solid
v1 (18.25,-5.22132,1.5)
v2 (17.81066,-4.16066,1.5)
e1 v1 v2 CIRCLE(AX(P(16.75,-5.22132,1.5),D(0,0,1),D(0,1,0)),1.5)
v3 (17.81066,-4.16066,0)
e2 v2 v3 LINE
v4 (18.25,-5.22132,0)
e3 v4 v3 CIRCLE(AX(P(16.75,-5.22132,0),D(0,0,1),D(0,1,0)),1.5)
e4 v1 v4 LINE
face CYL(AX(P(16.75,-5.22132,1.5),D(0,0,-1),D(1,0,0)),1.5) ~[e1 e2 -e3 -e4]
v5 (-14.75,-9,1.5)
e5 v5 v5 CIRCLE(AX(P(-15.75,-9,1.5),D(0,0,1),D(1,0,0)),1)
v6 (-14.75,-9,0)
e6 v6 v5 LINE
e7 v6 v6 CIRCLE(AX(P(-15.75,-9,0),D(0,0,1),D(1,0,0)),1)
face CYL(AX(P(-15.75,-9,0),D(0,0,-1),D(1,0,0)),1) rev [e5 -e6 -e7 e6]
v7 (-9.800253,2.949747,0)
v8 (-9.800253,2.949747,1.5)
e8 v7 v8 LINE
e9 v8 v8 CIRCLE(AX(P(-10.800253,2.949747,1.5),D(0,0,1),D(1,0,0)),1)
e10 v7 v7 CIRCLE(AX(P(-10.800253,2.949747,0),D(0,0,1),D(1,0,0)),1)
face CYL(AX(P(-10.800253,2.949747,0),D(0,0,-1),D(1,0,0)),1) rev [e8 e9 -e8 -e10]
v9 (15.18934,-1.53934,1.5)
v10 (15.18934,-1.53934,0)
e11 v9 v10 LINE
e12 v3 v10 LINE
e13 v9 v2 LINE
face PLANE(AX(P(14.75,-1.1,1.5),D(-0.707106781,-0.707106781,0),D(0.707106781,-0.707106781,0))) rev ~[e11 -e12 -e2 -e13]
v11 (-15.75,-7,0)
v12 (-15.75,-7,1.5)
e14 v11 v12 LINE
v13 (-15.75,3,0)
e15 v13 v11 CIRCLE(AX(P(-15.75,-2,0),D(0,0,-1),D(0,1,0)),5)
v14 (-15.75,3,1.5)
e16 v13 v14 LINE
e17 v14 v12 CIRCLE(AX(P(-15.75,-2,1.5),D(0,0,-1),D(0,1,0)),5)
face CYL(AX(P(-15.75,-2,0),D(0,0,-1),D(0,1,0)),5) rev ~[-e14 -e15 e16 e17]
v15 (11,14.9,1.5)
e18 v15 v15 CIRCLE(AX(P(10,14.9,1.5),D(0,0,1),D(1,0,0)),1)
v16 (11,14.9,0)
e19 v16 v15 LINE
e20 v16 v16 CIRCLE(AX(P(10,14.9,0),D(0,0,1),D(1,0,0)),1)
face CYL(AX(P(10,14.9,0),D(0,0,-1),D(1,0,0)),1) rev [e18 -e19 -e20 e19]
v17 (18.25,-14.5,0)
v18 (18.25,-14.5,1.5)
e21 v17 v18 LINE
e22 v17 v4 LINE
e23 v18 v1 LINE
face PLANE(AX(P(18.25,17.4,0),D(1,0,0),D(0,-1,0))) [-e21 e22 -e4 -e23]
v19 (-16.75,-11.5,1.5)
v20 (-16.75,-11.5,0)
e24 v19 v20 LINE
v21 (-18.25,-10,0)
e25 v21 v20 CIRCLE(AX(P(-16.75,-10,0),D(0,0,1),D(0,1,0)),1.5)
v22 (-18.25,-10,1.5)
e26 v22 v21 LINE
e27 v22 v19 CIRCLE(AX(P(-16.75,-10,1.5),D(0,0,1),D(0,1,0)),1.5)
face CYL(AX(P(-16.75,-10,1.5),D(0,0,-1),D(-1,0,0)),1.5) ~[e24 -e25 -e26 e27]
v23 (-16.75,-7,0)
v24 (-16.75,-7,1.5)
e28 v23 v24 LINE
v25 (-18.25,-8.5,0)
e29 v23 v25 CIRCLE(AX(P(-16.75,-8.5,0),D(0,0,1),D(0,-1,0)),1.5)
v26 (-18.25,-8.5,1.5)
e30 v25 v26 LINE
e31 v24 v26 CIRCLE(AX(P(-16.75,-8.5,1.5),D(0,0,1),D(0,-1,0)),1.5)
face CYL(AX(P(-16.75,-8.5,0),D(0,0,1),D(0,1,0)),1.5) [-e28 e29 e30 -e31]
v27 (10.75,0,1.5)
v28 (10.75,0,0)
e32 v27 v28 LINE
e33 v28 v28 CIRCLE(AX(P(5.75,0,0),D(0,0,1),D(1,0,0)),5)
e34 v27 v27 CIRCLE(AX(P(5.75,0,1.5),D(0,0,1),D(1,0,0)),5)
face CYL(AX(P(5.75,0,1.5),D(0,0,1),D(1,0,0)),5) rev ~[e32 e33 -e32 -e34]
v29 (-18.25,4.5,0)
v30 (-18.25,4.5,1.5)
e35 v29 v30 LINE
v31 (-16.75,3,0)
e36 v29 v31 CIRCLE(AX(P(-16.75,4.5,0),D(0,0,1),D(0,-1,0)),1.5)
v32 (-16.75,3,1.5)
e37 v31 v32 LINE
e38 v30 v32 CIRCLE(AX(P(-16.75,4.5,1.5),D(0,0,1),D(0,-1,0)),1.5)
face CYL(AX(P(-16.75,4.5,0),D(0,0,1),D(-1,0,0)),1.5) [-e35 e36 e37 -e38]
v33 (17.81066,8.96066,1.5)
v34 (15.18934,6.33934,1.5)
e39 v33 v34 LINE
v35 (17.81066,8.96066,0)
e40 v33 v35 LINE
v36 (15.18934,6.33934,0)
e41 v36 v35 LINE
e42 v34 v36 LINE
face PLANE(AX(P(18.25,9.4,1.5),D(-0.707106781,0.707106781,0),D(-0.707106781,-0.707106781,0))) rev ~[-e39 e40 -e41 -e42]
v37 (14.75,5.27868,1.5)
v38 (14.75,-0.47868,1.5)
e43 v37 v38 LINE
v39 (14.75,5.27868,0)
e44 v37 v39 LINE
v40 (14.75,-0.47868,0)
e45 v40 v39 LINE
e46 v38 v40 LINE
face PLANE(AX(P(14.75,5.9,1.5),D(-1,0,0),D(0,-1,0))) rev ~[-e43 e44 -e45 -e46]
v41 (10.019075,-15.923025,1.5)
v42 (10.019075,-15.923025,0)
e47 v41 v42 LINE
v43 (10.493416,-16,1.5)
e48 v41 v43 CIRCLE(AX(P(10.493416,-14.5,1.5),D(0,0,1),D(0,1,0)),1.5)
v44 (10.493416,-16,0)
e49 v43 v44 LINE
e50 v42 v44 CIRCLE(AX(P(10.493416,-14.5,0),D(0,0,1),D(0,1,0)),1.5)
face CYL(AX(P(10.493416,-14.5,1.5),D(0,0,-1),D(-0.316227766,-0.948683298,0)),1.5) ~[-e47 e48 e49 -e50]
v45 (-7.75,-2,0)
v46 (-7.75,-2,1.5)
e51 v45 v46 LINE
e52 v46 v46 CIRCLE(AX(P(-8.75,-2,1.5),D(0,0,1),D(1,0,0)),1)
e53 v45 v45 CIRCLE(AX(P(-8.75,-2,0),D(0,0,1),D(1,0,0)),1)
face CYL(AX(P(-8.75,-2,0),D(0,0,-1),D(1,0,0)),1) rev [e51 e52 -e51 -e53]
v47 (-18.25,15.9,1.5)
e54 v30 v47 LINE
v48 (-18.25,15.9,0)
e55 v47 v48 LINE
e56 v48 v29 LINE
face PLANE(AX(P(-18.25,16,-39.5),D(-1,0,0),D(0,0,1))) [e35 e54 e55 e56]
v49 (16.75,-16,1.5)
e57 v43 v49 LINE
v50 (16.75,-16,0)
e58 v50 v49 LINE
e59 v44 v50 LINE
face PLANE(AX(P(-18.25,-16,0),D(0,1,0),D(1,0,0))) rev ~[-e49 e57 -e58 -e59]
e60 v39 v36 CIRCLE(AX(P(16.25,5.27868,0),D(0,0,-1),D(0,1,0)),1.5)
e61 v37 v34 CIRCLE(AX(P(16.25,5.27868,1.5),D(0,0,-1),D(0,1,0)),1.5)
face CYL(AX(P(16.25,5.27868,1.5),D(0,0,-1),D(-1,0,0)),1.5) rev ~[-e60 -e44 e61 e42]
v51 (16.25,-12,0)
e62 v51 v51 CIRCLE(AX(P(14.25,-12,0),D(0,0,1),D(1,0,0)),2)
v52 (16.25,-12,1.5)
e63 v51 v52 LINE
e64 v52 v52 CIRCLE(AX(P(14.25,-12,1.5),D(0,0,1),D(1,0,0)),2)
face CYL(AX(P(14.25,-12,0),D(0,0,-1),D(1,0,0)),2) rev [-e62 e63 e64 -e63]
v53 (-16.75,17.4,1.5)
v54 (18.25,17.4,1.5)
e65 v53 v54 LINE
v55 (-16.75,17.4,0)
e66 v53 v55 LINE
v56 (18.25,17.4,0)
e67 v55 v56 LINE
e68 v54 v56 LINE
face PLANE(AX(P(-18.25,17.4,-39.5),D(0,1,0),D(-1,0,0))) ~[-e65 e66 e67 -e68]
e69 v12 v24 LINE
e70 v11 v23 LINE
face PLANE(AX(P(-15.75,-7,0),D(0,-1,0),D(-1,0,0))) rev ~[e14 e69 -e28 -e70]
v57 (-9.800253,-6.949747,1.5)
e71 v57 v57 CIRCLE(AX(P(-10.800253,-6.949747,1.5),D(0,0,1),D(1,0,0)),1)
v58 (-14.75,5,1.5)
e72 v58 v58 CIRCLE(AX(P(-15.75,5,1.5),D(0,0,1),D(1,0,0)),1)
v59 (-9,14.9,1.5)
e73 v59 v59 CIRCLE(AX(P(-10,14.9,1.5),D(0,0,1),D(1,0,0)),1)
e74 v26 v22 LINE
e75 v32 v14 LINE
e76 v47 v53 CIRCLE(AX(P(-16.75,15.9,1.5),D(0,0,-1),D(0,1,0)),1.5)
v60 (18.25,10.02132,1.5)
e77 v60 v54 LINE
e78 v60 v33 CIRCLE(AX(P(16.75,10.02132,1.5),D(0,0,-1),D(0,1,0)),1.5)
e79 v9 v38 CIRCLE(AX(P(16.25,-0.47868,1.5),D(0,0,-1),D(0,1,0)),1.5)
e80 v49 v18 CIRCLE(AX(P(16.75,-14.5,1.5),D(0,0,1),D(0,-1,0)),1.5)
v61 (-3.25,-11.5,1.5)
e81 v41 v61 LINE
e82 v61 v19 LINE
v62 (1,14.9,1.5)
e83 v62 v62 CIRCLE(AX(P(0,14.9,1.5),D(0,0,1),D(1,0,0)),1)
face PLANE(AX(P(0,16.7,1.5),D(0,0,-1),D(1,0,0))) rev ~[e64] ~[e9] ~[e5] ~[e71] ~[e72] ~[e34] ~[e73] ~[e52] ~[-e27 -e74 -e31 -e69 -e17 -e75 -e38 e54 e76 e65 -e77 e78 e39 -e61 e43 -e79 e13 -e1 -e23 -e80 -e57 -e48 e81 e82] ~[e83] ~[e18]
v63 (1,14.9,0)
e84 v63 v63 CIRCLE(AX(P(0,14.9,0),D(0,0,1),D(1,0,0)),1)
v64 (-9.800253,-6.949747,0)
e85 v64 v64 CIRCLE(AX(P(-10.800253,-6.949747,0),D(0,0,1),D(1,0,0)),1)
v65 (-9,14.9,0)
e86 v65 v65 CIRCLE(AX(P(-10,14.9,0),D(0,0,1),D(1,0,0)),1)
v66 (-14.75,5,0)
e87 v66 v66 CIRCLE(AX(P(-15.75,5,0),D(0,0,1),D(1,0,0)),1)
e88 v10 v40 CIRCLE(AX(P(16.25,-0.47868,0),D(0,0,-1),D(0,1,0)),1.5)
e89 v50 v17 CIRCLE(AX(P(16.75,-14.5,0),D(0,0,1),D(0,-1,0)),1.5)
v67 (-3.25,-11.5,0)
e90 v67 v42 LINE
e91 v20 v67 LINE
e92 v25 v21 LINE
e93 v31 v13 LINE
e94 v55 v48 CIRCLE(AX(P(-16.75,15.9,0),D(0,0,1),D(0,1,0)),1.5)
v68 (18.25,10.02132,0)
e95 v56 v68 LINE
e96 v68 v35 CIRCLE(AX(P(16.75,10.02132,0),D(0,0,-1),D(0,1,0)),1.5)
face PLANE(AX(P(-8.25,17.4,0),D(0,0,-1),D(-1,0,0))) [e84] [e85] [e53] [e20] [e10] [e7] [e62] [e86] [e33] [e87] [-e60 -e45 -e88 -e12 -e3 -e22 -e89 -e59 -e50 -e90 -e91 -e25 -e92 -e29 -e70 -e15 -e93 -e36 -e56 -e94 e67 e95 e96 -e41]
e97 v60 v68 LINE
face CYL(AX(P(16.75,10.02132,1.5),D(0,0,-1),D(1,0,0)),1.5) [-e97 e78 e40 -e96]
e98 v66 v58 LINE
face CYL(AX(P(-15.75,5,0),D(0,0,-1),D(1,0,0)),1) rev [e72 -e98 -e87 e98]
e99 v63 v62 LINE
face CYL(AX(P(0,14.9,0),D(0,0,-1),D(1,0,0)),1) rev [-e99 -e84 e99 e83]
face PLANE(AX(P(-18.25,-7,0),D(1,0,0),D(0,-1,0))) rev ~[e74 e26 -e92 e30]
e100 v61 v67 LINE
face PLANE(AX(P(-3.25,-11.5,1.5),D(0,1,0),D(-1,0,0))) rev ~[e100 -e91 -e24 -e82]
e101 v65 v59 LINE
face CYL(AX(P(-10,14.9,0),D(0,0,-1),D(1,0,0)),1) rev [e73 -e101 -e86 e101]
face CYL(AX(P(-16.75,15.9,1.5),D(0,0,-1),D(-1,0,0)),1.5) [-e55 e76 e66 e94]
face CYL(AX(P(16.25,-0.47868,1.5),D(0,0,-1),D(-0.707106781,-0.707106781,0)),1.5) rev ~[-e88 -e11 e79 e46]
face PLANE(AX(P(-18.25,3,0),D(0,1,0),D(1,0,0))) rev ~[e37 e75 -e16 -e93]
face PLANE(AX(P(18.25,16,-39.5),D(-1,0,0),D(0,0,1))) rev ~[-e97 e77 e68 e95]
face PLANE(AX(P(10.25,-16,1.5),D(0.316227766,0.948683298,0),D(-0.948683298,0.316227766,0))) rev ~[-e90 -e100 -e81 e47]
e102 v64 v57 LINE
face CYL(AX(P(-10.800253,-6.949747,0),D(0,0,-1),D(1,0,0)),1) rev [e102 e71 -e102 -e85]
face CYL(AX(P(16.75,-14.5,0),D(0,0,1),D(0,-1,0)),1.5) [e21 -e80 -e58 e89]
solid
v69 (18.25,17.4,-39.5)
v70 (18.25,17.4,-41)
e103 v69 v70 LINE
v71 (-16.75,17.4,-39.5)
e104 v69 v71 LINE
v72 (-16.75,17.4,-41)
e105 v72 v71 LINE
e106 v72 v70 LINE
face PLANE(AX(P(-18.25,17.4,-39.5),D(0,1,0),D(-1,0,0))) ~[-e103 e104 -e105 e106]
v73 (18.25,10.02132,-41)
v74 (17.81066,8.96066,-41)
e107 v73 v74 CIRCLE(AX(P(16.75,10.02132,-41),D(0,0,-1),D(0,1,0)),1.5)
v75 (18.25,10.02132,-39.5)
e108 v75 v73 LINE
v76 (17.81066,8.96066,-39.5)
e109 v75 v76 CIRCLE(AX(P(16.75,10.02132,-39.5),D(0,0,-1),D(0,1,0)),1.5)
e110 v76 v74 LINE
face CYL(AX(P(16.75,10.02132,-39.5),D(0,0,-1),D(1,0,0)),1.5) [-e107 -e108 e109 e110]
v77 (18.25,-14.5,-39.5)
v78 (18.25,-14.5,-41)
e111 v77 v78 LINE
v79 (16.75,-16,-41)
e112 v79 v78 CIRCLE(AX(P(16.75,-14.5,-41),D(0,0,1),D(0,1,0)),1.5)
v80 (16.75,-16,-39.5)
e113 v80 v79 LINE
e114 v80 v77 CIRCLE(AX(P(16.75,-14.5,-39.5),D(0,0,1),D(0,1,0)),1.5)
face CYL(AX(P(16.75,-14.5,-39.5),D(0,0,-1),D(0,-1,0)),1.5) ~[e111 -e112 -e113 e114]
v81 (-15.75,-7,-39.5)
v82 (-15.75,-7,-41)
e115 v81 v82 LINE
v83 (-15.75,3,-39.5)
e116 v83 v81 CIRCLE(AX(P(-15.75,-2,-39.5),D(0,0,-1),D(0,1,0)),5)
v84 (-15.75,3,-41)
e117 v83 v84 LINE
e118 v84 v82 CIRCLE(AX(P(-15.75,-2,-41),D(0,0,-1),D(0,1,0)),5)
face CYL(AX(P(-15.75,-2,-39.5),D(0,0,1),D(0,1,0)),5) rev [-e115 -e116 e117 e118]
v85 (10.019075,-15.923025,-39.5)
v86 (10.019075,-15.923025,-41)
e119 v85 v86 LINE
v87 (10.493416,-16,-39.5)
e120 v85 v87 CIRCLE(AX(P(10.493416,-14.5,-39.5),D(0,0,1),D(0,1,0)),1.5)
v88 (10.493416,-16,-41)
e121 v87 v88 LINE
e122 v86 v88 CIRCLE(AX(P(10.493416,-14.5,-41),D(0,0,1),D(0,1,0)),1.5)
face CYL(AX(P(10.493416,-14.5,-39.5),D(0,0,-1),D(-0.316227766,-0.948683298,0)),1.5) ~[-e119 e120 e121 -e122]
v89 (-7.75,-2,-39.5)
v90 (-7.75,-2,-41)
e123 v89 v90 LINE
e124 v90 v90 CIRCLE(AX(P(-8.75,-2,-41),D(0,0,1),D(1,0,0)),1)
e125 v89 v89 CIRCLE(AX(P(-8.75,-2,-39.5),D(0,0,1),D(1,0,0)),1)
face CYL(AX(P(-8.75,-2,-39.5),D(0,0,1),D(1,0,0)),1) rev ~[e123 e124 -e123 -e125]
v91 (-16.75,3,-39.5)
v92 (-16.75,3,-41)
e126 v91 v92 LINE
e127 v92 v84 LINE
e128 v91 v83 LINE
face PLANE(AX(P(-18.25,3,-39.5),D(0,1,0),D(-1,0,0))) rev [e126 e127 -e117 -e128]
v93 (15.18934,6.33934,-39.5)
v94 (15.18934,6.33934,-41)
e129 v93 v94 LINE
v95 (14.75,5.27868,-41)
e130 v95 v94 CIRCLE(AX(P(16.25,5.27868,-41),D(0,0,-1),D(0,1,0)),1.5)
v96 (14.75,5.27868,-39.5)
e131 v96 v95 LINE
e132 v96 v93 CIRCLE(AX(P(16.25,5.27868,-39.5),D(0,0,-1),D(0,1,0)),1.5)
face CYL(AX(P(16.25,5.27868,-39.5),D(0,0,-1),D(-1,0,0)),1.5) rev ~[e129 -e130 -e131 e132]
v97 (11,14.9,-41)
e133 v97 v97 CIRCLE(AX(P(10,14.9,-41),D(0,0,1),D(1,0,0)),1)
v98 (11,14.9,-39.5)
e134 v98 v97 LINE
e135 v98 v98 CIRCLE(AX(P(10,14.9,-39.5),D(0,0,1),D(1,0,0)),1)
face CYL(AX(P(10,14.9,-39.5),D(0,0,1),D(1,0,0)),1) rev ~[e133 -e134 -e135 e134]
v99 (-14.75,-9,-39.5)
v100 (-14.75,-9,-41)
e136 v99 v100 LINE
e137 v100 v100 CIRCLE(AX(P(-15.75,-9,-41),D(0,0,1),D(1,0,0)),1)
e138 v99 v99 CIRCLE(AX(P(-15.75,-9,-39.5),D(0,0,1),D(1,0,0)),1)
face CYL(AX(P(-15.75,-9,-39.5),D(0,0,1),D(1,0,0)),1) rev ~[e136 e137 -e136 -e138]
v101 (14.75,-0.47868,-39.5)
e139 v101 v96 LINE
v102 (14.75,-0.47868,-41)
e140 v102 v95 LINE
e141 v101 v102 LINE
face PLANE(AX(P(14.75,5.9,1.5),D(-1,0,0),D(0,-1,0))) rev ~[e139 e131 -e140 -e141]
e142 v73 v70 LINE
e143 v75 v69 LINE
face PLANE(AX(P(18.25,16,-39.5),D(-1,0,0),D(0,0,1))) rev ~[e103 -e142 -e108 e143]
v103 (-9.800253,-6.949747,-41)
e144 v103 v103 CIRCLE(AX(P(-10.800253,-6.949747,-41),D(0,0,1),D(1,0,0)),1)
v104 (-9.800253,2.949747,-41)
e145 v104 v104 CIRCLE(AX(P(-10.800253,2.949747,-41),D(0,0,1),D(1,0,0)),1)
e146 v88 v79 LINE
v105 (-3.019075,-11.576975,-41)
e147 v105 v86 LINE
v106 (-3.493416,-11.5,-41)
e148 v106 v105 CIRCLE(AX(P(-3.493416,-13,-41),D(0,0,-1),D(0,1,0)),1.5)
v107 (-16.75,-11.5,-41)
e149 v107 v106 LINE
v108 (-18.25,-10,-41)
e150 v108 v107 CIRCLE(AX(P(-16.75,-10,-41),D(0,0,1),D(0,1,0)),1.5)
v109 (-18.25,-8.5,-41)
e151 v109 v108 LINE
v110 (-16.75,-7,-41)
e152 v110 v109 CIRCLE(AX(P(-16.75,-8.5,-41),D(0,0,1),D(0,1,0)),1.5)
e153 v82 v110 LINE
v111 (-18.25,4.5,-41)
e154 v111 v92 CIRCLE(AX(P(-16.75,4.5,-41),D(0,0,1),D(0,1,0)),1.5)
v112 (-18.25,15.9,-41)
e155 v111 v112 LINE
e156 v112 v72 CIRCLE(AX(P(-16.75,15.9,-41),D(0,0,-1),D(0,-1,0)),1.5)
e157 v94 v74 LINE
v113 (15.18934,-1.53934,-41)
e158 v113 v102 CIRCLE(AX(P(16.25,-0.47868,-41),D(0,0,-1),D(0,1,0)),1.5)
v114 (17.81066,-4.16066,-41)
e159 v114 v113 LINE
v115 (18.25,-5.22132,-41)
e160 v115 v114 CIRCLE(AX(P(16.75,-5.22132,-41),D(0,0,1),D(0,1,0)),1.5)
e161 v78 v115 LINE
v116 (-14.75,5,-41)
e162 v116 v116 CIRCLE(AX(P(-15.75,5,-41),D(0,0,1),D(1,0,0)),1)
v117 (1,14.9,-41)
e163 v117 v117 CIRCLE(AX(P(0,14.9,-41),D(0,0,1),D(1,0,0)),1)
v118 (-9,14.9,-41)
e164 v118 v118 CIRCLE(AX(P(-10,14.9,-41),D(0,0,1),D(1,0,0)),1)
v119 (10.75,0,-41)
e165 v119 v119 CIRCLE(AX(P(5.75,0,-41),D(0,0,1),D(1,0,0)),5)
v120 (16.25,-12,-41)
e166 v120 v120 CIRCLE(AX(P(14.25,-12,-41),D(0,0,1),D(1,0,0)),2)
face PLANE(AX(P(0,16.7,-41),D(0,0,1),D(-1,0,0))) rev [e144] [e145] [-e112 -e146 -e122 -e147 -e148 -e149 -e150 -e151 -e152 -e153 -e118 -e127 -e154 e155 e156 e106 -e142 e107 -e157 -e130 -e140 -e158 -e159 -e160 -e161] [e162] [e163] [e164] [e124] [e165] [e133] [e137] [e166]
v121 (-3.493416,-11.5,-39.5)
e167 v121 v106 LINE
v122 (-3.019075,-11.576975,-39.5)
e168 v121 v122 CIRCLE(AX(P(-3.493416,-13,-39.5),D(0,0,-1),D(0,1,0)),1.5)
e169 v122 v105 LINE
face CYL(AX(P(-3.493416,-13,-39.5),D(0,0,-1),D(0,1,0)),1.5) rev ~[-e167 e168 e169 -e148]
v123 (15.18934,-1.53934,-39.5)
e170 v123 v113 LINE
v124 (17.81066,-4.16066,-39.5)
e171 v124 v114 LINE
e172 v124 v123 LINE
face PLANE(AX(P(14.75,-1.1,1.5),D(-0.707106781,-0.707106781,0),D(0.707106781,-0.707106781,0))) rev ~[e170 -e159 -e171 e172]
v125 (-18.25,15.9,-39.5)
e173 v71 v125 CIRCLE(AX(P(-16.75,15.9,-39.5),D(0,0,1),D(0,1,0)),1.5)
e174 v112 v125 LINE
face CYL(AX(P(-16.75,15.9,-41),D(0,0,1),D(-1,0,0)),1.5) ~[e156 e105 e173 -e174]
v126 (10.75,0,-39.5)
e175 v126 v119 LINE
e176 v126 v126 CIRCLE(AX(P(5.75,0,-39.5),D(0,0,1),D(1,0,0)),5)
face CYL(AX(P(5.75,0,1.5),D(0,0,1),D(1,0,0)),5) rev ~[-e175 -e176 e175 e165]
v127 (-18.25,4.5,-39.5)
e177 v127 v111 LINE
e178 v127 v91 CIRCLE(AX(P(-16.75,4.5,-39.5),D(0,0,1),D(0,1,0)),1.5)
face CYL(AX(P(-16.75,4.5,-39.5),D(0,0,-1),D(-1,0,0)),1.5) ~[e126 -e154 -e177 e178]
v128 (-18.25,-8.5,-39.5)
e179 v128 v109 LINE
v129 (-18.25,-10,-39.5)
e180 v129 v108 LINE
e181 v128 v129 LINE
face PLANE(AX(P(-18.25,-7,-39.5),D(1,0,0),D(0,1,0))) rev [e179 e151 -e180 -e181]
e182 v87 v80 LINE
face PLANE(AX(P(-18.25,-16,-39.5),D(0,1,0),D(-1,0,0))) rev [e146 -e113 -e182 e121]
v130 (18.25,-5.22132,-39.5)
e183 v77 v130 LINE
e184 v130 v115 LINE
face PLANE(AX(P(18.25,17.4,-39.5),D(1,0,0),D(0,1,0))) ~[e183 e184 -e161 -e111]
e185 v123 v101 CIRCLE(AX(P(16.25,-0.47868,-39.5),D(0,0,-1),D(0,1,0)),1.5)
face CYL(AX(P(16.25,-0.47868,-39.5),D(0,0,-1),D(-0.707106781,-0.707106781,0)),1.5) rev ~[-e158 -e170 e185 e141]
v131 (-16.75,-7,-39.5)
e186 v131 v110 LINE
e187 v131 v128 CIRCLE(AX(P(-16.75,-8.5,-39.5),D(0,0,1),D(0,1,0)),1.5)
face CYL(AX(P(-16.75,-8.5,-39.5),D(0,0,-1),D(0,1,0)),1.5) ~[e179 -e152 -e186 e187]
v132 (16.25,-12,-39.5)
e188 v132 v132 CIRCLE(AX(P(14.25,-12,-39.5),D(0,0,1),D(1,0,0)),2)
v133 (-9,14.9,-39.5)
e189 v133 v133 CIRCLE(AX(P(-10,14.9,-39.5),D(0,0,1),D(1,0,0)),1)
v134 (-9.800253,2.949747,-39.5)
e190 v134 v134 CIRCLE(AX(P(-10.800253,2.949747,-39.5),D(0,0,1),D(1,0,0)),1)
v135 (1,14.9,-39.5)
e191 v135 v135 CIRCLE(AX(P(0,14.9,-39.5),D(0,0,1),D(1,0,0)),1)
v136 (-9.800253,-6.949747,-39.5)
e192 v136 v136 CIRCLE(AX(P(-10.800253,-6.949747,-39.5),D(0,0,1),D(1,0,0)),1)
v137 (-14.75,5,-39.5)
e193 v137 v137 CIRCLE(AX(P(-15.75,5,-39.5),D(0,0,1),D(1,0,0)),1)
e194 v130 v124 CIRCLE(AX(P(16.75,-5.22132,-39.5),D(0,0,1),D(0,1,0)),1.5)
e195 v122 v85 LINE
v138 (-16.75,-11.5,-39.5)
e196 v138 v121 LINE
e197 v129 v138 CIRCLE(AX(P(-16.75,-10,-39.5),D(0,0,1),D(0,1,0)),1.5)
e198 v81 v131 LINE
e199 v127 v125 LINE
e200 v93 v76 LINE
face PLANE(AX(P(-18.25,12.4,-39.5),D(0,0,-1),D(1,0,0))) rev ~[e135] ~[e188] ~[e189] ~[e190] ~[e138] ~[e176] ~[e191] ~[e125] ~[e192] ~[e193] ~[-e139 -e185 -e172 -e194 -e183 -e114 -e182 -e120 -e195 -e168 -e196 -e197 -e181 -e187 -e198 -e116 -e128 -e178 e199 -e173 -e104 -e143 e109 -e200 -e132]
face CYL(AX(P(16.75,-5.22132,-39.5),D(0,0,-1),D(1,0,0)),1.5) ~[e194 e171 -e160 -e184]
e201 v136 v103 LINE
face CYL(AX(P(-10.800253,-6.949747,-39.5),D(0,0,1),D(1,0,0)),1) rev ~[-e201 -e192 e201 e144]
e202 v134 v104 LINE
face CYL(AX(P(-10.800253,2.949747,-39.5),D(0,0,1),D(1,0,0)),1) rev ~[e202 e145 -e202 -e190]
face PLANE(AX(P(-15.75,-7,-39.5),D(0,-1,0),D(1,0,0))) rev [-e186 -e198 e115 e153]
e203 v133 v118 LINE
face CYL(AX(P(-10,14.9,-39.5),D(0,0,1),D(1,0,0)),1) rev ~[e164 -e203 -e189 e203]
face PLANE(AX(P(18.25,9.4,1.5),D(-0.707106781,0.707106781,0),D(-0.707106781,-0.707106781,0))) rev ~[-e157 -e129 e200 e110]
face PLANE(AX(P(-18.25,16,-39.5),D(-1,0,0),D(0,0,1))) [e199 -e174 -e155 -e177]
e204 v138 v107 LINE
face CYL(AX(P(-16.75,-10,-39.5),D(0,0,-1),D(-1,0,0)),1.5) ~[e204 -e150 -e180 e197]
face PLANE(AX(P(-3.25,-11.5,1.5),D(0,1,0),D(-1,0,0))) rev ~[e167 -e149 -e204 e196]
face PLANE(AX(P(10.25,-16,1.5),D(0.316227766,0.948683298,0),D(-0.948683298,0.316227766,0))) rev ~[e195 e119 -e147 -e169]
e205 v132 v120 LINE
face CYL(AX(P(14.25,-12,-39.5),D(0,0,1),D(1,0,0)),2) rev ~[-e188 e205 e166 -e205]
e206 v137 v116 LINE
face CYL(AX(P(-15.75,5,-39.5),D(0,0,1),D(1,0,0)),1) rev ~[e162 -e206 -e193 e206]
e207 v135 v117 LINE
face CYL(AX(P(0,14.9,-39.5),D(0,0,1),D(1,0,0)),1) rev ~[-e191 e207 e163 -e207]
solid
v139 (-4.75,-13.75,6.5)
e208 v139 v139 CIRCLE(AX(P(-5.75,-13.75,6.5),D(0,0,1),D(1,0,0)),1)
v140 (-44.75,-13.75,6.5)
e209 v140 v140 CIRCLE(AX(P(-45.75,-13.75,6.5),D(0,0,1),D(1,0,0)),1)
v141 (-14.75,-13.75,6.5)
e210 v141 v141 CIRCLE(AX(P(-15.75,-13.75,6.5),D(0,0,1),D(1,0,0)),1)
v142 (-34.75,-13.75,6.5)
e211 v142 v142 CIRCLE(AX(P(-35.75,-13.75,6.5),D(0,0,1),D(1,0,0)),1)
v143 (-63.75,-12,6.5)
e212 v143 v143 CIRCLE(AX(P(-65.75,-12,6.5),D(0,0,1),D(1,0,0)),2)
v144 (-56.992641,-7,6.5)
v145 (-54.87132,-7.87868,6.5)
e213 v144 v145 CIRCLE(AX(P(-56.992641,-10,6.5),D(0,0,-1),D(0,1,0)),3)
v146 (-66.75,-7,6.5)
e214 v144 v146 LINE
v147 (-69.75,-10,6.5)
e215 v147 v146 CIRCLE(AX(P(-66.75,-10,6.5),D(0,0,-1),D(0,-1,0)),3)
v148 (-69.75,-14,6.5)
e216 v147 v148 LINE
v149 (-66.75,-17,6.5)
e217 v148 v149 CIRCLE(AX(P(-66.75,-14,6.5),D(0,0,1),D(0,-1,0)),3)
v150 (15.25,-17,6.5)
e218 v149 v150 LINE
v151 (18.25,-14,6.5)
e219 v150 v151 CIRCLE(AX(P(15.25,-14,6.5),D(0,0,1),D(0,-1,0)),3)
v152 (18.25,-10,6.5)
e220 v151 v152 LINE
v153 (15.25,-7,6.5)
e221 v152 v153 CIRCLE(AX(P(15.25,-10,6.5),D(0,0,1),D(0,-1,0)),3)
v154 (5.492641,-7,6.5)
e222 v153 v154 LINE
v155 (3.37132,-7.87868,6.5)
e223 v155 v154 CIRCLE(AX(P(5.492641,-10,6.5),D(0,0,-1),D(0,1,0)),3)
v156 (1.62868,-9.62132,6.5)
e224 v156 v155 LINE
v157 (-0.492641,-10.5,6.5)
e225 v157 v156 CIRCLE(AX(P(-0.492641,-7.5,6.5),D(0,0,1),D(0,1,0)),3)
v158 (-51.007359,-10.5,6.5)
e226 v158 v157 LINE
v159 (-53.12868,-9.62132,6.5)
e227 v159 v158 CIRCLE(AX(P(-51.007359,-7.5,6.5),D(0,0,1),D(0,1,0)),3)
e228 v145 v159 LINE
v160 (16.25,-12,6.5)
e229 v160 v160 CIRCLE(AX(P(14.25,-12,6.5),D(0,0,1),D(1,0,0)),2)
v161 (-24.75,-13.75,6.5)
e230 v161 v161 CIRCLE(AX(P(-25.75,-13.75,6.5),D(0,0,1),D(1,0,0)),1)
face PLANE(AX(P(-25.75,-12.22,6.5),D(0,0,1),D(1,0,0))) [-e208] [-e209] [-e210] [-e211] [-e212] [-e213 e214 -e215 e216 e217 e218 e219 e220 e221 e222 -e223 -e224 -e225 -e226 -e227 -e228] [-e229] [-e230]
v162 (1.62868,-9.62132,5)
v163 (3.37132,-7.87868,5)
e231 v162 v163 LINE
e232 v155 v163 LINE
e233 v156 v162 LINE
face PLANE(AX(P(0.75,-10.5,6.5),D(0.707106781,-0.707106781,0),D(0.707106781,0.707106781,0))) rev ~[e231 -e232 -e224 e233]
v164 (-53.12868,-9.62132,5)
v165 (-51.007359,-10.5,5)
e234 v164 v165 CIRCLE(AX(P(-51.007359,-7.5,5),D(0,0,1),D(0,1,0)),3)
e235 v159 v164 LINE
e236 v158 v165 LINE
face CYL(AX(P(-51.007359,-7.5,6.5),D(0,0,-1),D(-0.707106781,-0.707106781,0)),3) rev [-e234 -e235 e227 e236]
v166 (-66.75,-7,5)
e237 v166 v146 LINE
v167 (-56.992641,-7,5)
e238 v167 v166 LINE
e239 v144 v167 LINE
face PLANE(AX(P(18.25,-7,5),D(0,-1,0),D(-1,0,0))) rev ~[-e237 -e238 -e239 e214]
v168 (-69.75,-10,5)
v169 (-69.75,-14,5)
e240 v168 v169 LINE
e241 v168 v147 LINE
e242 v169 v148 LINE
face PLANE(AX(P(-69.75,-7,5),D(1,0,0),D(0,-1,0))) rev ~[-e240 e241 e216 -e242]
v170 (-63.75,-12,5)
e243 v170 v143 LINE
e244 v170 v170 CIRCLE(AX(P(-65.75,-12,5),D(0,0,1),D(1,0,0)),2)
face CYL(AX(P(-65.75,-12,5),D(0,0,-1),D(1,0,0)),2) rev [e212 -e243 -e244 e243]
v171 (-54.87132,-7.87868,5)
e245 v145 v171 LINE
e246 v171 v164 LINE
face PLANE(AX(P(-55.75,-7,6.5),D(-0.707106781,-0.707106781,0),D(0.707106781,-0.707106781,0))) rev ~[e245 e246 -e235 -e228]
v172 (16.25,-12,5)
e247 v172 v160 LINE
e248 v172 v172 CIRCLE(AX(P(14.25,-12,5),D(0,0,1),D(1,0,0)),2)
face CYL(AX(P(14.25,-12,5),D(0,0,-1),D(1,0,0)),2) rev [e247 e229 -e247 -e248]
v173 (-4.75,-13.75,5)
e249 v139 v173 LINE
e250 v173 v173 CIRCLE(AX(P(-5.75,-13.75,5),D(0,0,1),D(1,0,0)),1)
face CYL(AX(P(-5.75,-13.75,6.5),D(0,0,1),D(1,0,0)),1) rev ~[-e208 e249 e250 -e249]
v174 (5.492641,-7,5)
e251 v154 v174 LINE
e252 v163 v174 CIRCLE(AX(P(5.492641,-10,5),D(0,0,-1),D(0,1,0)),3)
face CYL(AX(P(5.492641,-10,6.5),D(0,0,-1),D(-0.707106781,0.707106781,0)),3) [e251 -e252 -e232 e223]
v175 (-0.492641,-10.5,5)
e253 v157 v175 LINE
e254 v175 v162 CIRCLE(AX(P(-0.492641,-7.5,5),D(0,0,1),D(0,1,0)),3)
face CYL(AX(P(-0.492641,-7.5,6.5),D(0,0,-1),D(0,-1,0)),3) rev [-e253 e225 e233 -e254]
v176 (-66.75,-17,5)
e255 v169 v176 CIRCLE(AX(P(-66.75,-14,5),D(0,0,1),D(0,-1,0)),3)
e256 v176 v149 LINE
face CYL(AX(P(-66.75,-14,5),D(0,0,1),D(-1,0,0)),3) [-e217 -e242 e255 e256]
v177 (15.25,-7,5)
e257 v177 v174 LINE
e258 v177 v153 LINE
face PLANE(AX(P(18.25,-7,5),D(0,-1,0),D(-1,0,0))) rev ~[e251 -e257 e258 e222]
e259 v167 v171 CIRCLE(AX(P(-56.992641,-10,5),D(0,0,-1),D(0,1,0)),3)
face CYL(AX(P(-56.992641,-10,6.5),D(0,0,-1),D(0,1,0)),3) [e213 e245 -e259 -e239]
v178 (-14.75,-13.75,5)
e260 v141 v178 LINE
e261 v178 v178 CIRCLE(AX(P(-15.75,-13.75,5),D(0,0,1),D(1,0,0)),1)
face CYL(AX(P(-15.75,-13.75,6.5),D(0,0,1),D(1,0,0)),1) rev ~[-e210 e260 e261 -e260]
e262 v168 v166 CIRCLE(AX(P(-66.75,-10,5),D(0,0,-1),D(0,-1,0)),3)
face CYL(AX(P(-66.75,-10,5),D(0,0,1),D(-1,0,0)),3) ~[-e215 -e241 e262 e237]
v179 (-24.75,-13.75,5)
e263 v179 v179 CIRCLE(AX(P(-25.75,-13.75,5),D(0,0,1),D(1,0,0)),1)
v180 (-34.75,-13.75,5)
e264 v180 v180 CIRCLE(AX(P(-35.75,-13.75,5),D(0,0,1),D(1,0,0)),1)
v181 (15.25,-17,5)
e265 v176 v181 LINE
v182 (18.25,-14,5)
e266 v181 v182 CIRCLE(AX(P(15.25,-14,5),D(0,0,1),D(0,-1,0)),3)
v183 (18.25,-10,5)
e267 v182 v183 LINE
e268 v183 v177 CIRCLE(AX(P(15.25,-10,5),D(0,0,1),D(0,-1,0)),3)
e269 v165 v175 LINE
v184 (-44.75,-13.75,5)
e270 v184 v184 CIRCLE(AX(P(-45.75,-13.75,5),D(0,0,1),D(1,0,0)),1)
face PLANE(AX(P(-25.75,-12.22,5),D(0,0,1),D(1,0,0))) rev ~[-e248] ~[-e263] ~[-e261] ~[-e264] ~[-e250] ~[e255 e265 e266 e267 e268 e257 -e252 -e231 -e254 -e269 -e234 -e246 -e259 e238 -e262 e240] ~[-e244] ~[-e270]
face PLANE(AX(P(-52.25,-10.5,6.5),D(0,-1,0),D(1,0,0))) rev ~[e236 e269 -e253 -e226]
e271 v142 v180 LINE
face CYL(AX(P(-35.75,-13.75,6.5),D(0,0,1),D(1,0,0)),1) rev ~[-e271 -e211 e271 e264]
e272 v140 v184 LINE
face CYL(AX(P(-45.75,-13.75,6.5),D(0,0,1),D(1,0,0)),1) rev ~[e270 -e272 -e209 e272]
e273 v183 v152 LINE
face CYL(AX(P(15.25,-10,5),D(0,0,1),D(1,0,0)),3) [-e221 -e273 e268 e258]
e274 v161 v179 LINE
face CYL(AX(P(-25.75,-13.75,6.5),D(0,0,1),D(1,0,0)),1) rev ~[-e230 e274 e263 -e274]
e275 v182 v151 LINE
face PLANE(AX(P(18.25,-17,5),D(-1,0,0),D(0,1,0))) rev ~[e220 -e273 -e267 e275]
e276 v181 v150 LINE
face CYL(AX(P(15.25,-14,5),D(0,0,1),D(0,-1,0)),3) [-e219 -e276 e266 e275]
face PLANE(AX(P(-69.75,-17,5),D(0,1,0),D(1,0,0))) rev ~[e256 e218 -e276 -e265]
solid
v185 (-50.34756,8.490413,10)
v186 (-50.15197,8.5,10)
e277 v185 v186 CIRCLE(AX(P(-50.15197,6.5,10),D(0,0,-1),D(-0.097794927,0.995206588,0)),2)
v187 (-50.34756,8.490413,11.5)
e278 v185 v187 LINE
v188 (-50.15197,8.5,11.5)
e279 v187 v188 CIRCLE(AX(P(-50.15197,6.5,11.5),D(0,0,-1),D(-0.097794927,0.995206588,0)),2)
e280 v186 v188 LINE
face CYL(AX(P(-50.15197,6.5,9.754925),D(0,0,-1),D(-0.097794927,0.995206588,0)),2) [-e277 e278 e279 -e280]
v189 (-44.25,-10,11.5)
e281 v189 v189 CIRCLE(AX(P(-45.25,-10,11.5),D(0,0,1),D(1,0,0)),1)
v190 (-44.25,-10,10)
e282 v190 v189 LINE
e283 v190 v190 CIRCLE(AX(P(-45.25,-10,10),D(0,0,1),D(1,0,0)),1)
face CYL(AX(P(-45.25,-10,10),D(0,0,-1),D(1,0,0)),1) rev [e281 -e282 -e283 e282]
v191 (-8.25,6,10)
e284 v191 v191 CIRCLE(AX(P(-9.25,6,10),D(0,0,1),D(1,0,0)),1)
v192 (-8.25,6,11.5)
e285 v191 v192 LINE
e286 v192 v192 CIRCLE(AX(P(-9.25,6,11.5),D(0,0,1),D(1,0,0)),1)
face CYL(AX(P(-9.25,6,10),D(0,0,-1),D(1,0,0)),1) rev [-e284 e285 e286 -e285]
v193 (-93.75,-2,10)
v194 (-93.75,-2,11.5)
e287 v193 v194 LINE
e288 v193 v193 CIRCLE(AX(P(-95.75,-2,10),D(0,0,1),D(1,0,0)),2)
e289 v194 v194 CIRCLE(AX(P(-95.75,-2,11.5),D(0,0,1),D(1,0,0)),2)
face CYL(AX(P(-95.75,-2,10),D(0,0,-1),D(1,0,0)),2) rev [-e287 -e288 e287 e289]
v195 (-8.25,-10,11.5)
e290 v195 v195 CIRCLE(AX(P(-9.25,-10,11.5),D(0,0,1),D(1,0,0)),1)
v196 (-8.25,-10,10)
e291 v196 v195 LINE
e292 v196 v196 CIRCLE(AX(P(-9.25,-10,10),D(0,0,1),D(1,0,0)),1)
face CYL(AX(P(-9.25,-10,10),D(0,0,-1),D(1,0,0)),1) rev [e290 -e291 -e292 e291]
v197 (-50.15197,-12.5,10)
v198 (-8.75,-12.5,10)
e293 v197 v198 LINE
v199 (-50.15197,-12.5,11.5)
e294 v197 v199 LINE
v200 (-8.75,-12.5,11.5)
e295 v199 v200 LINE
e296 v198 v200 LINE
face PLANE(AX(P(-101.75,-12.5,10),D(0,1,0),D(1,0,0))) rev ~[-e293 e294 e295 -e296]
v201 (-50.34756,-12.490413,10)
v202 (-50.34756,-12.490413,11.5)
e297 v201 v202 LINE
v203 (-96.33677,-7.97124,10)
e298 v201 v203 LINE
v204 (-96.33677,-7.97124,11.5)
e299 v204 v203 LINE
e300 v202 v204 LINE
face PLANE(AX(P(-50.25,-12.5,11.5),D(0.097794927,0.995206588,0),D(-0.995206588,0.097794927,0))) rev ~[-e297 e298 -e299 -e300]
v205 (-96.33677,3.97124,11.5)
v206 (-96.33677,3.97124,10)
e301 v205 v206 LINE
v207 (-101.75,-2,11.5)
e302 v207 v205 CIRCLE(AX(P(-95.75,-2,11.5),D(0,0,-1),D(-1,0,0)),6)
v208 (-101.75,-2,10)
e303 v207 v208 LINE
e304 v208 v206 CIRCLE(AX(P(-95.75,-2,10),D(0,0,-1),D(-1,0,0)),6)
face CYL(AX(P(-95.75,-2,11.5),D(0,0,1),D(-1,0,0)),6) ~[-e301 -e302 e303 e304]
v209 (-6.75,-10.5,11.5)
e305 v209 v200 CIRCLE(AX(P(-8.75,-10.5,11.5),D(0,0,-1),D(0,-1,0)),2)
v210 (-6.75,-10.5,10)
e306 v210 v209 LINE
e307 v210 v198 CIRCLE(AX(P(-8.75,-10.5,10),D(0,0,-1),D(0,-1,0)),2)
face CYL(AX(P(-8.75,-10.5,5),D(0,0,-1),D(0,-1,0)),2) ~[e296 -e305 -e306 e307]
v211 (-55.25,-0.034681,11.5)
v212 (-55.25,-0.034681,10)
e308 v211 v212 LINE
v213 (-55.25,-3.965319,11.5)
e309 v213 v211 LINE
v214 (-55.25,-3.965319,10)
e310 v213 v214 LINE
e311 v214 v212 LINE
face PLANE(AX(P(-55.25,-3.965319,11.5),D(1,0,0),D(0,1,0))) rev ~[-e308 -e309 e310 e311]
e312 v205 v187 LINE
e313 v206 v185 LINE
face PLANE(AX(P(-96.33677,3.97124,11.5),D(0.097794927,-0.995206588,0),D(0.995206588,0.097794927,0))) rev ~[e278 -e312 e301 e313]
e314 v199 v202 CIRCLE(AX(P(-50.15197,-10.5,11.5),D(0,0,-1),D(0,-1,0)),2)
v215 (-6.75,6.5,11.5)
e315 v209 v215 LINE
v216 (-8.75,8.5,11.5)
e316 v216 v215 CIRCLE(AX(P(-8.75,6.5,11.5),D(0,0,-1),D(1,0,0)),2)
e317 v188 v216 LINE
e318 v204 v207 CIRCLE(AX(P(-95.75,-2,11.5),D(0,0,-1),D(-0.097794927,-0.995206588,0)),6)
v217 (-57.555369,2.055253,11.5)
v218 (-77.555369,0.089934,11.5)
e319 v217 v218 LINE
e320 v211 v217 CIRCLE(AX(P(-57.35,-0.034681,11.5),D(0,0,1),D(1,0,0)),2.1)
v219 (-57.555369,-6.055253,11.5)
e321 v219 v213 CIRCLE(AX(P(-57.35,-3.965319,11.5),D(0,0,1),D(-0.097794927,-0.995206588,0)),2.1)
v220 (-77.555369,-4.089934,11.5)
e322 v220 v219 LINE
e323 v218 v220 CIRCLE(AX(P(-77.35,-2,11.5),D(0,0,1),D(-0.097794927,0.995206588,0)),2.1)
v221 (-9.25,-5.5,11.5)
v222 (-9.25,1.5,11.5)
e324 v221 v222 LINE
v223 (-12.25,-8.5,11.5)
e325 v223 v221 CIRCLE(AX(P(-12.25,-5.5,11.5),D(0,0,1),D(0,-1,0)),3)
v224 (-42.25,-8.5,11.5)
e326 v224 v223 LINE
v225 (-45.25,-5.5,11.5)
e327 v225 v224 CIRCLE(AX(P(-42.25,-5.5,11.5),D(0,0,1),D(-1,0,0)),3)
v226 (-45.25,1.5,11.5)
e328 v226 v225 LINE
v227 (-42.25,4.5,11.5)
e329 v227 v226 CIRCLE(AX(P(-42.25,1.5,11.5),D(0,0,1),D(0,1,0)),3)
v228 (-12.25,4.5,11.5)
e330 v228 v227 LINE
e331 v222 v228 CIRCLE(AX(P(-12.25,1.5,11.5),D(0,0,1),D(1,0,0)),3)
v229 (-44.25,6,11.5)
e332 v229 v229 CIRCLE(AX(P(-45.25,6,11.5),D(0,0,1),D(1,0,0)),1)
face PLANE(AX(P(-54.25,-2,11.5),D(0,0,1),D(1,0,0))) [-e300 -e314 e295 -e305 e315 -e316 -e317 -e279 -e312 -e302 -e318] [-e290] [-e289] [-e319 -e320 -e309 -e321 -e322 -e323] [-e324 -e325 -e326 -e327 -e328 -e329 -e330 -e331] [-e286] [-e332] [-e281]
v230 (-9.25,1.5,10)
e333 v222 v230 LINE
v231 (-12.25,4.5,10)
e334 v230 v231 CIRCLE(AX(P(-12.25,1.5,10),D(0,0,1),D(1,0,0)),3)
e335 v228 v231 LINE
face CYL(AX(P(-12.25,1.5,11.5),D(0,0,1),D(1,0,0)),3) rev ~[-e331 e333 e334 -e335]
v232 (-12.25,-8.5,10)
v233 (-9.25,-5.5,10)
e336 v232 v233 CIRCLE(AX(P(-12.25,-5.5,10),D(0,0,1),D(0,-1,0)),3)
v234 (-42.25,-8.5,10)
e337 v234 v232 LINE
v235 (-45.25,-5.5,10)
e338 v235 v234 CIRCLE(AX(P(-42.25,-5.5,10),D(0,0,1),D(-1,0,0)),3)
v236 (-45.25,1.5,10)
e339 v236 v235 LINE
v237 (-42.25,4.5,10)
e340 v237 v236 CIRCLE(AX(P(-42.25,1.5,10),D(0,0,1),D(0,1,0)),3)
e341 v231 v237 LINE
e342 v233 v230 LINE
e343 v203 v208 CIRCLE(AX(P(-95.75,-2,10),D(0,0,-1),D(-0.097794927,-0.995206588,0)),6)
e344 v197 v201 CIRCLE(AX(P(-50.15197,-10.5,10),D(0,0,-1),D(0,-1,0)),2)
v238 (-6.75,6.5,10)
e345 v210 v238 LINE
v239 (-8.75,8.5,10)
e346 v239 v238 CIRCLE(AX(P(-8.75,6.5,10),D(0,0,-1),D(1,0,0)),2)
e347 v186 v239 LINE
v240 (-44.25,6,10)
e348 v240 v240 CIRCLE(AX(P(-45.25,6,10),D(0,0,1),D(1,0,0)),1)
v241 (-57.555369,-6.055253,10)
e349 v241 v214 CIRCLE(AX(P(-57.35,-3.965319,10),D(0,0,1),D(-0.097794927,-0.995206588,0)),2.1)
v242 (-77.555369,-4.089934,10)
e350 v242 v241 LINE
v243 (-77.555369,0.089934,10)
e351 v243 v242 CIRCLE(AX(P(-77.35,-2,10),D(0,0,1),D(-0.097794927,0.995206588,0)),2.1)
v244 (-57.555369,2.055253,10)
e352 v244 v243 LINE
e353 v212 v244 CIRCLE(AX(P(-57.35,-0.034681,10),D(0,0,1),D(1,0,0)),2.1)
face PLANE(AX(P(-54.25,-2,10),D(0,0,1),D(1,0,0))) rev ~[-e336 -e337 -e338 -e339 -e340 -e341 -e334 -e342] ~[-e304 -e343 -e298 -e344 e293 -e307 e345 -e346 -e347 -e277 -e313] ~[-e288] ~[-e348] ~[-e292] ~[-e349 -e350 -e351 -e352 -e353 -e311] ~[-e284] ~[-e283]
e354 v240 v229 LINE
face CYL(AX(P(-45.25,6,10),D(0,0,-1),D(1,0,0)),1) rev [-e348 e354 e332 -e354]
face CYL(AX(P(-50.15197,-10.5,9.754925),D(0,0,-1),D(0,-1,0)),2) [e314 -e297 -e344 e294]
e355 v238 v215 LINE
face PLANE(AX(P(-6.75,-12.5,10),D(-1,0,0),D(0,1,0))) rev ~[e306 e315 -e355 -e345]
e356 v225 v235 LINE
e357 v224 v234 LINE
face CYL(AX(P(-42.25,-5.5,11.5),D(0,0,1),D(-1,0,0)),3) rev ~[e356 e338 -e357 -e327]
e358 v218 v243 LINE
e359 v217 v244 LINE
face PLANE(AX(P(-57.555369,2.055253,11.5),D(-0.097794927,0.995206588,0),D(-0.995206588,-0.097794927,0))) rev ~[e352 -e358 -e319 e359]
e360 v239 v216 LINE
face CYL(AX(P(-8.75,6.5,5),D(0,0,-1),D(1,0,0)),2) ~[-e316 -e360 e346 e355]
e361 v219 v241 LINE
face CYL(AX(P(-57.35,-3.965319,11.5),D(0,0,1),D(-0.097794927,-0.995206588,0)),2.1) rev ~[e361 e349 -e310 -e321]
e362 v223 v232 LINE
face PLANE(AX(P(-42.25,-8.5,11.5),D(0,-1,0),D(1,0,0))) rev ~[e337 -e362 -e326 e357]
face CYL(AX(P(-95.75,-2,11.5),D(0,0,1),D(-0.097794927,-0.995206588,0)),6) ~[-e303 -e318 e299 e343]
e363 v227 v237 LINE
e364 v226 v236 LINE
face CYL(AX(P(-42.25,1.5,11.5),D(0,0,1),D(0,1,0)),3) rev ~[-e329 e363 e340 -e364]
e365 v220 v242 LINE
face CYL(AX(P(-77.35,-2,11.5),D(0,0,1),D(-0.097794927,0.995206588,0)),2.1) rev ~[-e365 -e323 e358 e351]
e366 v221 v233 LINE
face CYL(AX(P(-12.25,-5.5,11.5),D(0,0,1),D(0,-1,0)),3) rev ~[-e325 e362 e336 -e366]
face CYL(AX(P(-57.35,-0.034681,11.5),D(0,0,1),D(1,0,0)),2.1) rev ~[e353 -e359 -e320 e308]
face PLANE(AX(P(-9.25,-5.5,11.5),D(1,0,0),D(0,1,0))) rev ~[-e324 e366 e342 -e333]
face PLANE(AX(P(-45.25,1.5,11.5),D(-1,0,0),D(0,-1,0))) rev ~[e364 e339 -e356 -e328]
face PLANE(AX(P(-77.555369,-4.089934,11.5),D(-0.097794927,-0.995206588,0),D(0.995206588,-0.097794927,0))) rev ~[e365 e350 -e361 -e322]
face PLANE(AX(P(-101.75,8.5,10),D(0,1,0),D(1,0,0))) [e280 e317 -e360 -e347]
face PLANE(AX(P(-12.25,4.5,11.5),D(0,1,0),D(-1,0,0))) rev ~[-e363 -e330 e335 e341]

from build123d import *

# Parameters (mm, degrees)
F0_R          = 1
F0_R_2        = 2
F1_DEPTH      = 1.5
F2_W          = 36.5
F2_H          = 1.4
F3_DEPTH      = 19.75
F3_DEPTH_BACK = 1.5
F6_W          = 10
F6_H          = 39.5
F7_DEPTH      = 1.4
F10_R         = 2
F10_W         = 30
F10_H         = 2
F11_DEPTH     = 1.5
F13_W         = 95
F13_H         = 21
F13_R         = 1
F13_R_2       = 2
F14_DEPTH     = 1.5
F16_DEPTH     = 1.5
F19_R         = 5
F20_DEPTH     = 103.001
F22_DEPTH     = 1.5
F23_R         = 3
F25_DEPTH     = 1.5
F26_T1_DEPTH  = 1.9901493782
F26_T3_DEPTH  = 11.5
F27_R         = 1.5
F27_2_R       = 1.5
F29_W         = 36.5
F29_H         = 39.5
F30_DEPTH     = 3.6
F31_DEPTH     = 5
F32_R         = 1
F33_DEPTH     = 1.5


# Not quite as in the source:
# - a fillet or chamfer that OpenCascade refuses, or shapes differently, is made with other operations: its cross-section is extruded or revolved along the edge and cut away or added


with BuildPart() as f1:
    # F0 (on Top) → F1 (new body)
    with BuildSketch(Plane.XY):
        with BuildLine():
            Line((18.25, -16), (18.25, 16))
            Line((18.25, 16), (-18.25, 16))
            Line((-18.25, 16), (-18.25, 3))
            Line((-18.25, 3), (-15.75, 3))
            ThreePointArc((-15.75, 3), (-10.75, -2), (-15.75, -7))
            Line((-15.75, -7), (-18.25, -7))
            Line((-18.25, -7), (-18.25, -16))
            Line((-18.25, -16), (18.25, -16))
        make_face()
        with Locations((-15.75, -9)):
            Circle(F0_R, mode=Mode.SUBTRACT)
        with Locations((-10.8002525317, -6.9497474683)):
            Circle(F0_R, mode=Mode.SUBTRACT)
        with Locations((-8.75, -2)):
            Circle(F0_R, mode=Mode.SUBTRACT)
        with Locations((14.25, -12)):
            Circle(F0_R_2, mode=Mode.SUBTRACT)
        with Locations((-10.8002525317, 2.9497474683)):
            Circle(F0_R, mode=Mode.SUBTRACT)
        with Locations((-15.75, 5)):
            Circle(F0_R, mode=Mode.SUBTRACT)
        with Locations((-10, 14.9)):
            Circle(F0_R, mode=Mode.SUBTRACT)
        with Locations((0, 14.9)):
            Circle(F0_R, mode=Mode.SUBTRACT)
        with Locations((10, 14.9)):
            Circle(F0_R, mode=Mode.SUBTRACT)
    extrude(amount=F1_DEPTH)

    # F2 (on face) → F3 (join, two sides)
    with BuildSketch(Plane(origin=(0, 0, 0), x_dir=(1, 0, 0), z_dir=(0, 0, -1))) as f3_sk:
        with Locations((0, -16.7)):
            Rectangle(F2_W, F2_H)
    extrude(amount=F3_DEPTH)
    extrude(f3_sk.sketch, amount=-F3_DEPTH_BACK)


with BuildPart() as f5_1:
    # F5: instance of F1
    add(f1.part.mirror(Plane(origin=(0, 16.7, -19.75), x_dir=(1, 0, 0), z_dir=(0, 0, -1))))


with BuildPart() as f7_tool:
    # F6 (on face) → F7 (new body, through all)
    with BuildSketch(Plane(origin=(0, 17.4, 0), x_dir=(-1, 0, 0), z_dir=(0, 1, 0))):
        with Locations((13.25, -19.75)):
            Rectangle(F6_W, F6_H)
    extrude(amount=-F7_DEPTH)


with BuildPart() as f1_1:
    add(f1.part)

    # F7: cut by f7_tool
    add(f7_tool.part, mode=Mode.SUBTRACT)


with BuildPart() as f5_1_1:
    add(f5_1.part)

    # F7: cut by f7_tool
    add(f7_tool.part, mode=Mode.SUBTRACT)


with BuildPart() as f11:
    # F10 (on offset) → F11 (new body)
    with BuildSketch(Plane.XY.offset(5)):
        Polygon((-40.75, -7), (-69.75, -7), (-69.75, -17), (18.25, -17), (18.25, -7), (-10.75, -7), (-10.75, -9), (-40.75, -9), align=None)
        with Locations((-65.75, -12)):
            Circle(F10_R, mode=Mode.SUBTRACT)
        with Locations((14.25, -12)):
            Circle(F10_R, mode=Mode.SUBTRACT)
        with Locations((-25.75, -8)):
            Rectangle(F10_W, F10_H)
    extrude(amount=F11_DEPTH)

    # F21 (on face) → F22 (cut, through all)
    with BuildSketch(Plane.XY.offset(6.5)):
        Polygon((4.25, -7), (-55.75, -7), (-52.25, -10.5), (-25.75, -10.5), (0.75, -10.5), align=None)
    extrude(amount=-F22_DEPTH, mode=Mode.SUBTRACT)

    # F23
    f23_edges = [f11.edges().sort_by_distance(p)[0] for p in [
        (-69.75, -7, 5.75),
        (-69.75, -17, 5.75),
        (18.25, -7, 5.75),
        (18.25, -17, 5.75),
        (-55.75, -7, 5.75),
        (-52.25, -10.5, 5.75),
        (0.75, -10.5, 5.75),
        (4.25, -7, 5.75),
    ]]
    fillet(f23_edges, radius=F23_R)

    # F32 (on face) → F33 (cut, through all)
    with BuildSketch(Plane.XY.offset(6.5)):
        with Locations((-25.75, -13.75)):
            Circle(F32_R)
        with Locations((-35.75, -13.75)):
            Circle(F32_R)
        with Locations((-45.75, -13.75)):
            Circle(F32_R)
        with Locations((-15.75, -13.75)):
            Circle(F32_R)
        with Locations((-5.75, -13.75)):
            Circle(F32_R)
    extrude(amount=-F33_DEPTH, mode=Mode.SUBTRACT)


with BuildPart() as f14:
    # F13 (on offset) → F14 (new body)
    with BuildSketch(Plane.XY.offset(10)):
        with Locations((-54.25, -2)):
            Rectangle(F13_W, F13_H)
        with Locations((-45.25, -10)):
            Circle(F13_R, mode=Mode.SUBTRACT)
        with Locations((-9.25, -10)):
            Circle(F13_R, mode=Mode.SUBTRACT)
        with Locations((-95.75, -2)):
            Circle(F13_R_2, mode=Mode.SUBTRACT)
        with Locations((-45.25, 6)):
            Circle(F13_R, mode=Mode.SUBTRACT)
        with Locations((-9.25, 6)):
            Circle(F13_R, mode=Mode.SUBTRACT)
    extrude(amount=F14_DEPTH)

    # F15 (on face) → F16 (cut, through all)
    with BuildSketch(Plane.XY.offset(11.5)):
        with BuildLine():
            ThreePointArc((-101.75, -2), (-100.1952568748, 2.0298500365), (-96.336769561, 3.9712395264))
            Line((-96.336769561, 3.9712395264), (-50.25, 8.5))
            Line((-50.25, 8.5), (-101.75, 8.5))
            Line((-101.75, 8.5), (-101.75, -2))
        make_face()
        with BuildLine():
            Line((-50.25, -12.5), (-96.336769561, -7.9712395264))
            ThreePointArc((-96.336769561, -7.9712395264), (-100.1952568748, -6.0298500365), (-101.75, -2))
            Line((-101.75, -2), (-101.75, -12.5))
            Line((-101.75, -12.5), (-50.25, -12.5))
        make_face()
        with BuildLine():
            Line((-57.5553693464, 2.0552529559), (-77.5553693464, 0.0899338343))
            ThreePointArc((-77.5553693464, 0.0899338343), (-79.45, -2), (-77.5553693464, -4.0899338343))
            Line((-77.5553693464, -4.0899338343), (-57.5553693464, -6.0552529559))
            ThreePointArc((-57.5553693464, -6.0552529559), (-55.9395524872, -5.5211590278), (-55.25, -3.9653191216))
            Line((-55.25, -3.9653191216), (-55.25, -2))
            Line((-55.25, -2), (-55.25, -0.0346808784))
            ThreePointArc((-55.25, -0.0346808784), (-55.9395524872, 1.5211590278), (-57.5553693464, 2.0552529559))
        make_face()
    extrude(amount=-F16_DEPTH, mode=Mode.SUBTRACT)

    # F24 (on face) → F25 (cut, through all)
    with BuildSketch(Plane.XY.offset(11.5)):
        with BuildLine():
            Line((-12.25, 4.5), (-42.25, 4.5))
            ThreePointArc((-42.25, 4.5), (-44.3713203436, 3.6213203436), (-45.25, 1.5))
            Line((-45.25, 1.5), (-45.25, -5.5))
            ThreePointArc((-45.25, -5.5), (-44.3713203436, -7.6213203436), (-42.25, -8.5))
            Line((-42.25, -8.5), (-12.25, -8.5))
            ThreePointArc((-12.25, -8.5), (-10.1286796564, -7.6213203436), (-9.25, -5.5))
            Line((-9.25, -5.5), (-9.25, 1.5))
            ThreePointArc((-9.25, 1.5), (-10.1286796564, 3.6213203436), (-12.25, 4.5))
        make_face()
    extrude(amount=-F25_DEPTH, mode=Mode.SUBTRACT)

    # F26: fillet of radius 2 on 4 edges, made by hand

    # F26_s2 → F26_t1 (cut)
    with BuildSketch(Plane.XY.offset(9.7549253109)):
        with BuildLine():
            ThreePointArc((-50.347559978, 8.4904131755), (-50.2498824551, 8.4976018561), (-50.1519701244, 8.5))
            Line((-50.1519701244, 8.5), (-50.25, 8.5))
            Line((-50.25, 8.5), (-50.347559978, 8.4904131755))
        make_face()
        with BuildLine():
            ThreePointArc((-50.1519701244, -12.5), (-50.2498824551, -12.4976018561), (-50.347559978, -12.4904131755))
            Line((-50.347559978, -12.4904131755), (-50.25, -12.5))
            Line((-50.25, -12.5), (-50.1519701244, -12.5))
        make_face()
    extrude(amount=F26_T1_DEPTH, mode=Mode.SUBTRACT)

    # F26_s4 → F26_t3 (cut)
    with BuildSketch(Plane.XY.offset(5)):
        with BuildLine():
            ThreePointArc((-8.75, -12.5), (-7.3357864376, -11.9142135624), (-6.75, -10.5))
            Line((-6.75, -10.5), (-6.75, -12.5))
            Line((-6.75, -12.5), (-8.75, -12.5))
        make_face()
        with BuildLine():
            ThreePointArc((-6.75, 6.5), (-7.3357864376, 7.9142135624), (-8.75, 8.5))
            Line((-8.75, 8.5), (-6.75, 8.5))
            Line((-6.75, 8.5), (-6.75, 6.5))
        make_face()
    extrude(amount=F26_T3_DEPTH, mode=Mode.SUBTRACT)


with BuildPart() as f18_1:
    # F18: instance of F1
    add(f1_1.part.mirror(Plane.XY.offset(-50)))


with BuildPart() as f20_tool:
    # F19 (on face) → F20 (new body, through all)
    with BuildSketch(Plane.XY.offset(1.5)):
        Polygon((18.25, -4.6), (18.25, 9.4), (14.75, 5.9), (14.75, 2.4), (14.75, -1.1), align=None)
        with Locations((5.75, 0)):
            Circle(F19_R)
        Polygon((-3.25, -11.5), (-18.25, -11.5), (-18.25, -16), (10.25, -16), align=None)
    extrude(amount=-F20_DEPTH)


with BuildPart() as f1_2:
    add(f1_1.part)

    # F20: cut by f20_tool
    add(f20_tool.part, mode=Mode.SUBTRACT)

    # F27
    f27_edges = [f1_2.edges().sort_by_distance(p)[0] for p in [
        (18.25, -4.6, 0.75),
        (18.25, 9.4, 0.75),
        (10.25, -16, 0.75),
        (18.25, -16, 0.75),
        (14.75, -1.1, 0.75),
        (14.75, 5.9, 0.75),
        (-18.25, 17.4, 0.75),
        (-18.25, 3, 0.75),
        (-18.25, -7, 0.75),
        (-18.25, -11.5, 0.75),
    ]]
    fillet(f27_edges, radius=F27_R)



with BuildPart() as f5_1_2:
    add(f5_1_1.part)

    # F20: cut by f20_tool
    add(f20_tool.part, mode=Mode.SUBTRACT)

    # F27#2
    f27_2_edges = [f5_1_2.edges().sort_by_distance(p)[0] for p in [
        (-18.25, -11.5, -40.25),
        (-3.25, -11.5, -40.25),
        (10.25, -16, -40.25),
        (18.25, -16, -40.25),
        (14.75, -1.1, -40.25),
        (14.75, 5.9, -40.25),
        (-18.25, 17.4, -40.25),
        (-18.25, -7, -40.25),
        (-18.25, 3, -40.25),
        (18.25, -4.6, -40.25),
        (18.25, 9.4, -40.25),
    ]]
    fillet(f27_2_edges, radius=F27_2_R)


with BuildPart() as f18_1_1:
    add(f18_1.part)

    # F20: cut by f20_tool
    add(f20_tool.part, mode=Mode.SUBTRACT)


with BuildPart() as f1_3:
    add(f1_2.part)

    add(f5_1_2.part)  # F30 merges F5_1
    # F29 (on face) → F30 (join)
    with BuildSketch(Plane.XZ.offset(-16)):
        with Locations((0, -19.75)):
            Rectangle(F29_W, F29_H)
    extrude(amount=F30_DEPTH)

    # F31 (cut): a face of the model
    f31_faces = [f1_3.faces().sort_by_distance(p)[0] for p in [
        (0, 12.4, -19.75),
    ]]
    extrude(f31_faces, amount=-F31_DEPTH, mode=Mode.SUBTRACT)


solid = Compound([f11.part, f14.part, f1_3.part])
